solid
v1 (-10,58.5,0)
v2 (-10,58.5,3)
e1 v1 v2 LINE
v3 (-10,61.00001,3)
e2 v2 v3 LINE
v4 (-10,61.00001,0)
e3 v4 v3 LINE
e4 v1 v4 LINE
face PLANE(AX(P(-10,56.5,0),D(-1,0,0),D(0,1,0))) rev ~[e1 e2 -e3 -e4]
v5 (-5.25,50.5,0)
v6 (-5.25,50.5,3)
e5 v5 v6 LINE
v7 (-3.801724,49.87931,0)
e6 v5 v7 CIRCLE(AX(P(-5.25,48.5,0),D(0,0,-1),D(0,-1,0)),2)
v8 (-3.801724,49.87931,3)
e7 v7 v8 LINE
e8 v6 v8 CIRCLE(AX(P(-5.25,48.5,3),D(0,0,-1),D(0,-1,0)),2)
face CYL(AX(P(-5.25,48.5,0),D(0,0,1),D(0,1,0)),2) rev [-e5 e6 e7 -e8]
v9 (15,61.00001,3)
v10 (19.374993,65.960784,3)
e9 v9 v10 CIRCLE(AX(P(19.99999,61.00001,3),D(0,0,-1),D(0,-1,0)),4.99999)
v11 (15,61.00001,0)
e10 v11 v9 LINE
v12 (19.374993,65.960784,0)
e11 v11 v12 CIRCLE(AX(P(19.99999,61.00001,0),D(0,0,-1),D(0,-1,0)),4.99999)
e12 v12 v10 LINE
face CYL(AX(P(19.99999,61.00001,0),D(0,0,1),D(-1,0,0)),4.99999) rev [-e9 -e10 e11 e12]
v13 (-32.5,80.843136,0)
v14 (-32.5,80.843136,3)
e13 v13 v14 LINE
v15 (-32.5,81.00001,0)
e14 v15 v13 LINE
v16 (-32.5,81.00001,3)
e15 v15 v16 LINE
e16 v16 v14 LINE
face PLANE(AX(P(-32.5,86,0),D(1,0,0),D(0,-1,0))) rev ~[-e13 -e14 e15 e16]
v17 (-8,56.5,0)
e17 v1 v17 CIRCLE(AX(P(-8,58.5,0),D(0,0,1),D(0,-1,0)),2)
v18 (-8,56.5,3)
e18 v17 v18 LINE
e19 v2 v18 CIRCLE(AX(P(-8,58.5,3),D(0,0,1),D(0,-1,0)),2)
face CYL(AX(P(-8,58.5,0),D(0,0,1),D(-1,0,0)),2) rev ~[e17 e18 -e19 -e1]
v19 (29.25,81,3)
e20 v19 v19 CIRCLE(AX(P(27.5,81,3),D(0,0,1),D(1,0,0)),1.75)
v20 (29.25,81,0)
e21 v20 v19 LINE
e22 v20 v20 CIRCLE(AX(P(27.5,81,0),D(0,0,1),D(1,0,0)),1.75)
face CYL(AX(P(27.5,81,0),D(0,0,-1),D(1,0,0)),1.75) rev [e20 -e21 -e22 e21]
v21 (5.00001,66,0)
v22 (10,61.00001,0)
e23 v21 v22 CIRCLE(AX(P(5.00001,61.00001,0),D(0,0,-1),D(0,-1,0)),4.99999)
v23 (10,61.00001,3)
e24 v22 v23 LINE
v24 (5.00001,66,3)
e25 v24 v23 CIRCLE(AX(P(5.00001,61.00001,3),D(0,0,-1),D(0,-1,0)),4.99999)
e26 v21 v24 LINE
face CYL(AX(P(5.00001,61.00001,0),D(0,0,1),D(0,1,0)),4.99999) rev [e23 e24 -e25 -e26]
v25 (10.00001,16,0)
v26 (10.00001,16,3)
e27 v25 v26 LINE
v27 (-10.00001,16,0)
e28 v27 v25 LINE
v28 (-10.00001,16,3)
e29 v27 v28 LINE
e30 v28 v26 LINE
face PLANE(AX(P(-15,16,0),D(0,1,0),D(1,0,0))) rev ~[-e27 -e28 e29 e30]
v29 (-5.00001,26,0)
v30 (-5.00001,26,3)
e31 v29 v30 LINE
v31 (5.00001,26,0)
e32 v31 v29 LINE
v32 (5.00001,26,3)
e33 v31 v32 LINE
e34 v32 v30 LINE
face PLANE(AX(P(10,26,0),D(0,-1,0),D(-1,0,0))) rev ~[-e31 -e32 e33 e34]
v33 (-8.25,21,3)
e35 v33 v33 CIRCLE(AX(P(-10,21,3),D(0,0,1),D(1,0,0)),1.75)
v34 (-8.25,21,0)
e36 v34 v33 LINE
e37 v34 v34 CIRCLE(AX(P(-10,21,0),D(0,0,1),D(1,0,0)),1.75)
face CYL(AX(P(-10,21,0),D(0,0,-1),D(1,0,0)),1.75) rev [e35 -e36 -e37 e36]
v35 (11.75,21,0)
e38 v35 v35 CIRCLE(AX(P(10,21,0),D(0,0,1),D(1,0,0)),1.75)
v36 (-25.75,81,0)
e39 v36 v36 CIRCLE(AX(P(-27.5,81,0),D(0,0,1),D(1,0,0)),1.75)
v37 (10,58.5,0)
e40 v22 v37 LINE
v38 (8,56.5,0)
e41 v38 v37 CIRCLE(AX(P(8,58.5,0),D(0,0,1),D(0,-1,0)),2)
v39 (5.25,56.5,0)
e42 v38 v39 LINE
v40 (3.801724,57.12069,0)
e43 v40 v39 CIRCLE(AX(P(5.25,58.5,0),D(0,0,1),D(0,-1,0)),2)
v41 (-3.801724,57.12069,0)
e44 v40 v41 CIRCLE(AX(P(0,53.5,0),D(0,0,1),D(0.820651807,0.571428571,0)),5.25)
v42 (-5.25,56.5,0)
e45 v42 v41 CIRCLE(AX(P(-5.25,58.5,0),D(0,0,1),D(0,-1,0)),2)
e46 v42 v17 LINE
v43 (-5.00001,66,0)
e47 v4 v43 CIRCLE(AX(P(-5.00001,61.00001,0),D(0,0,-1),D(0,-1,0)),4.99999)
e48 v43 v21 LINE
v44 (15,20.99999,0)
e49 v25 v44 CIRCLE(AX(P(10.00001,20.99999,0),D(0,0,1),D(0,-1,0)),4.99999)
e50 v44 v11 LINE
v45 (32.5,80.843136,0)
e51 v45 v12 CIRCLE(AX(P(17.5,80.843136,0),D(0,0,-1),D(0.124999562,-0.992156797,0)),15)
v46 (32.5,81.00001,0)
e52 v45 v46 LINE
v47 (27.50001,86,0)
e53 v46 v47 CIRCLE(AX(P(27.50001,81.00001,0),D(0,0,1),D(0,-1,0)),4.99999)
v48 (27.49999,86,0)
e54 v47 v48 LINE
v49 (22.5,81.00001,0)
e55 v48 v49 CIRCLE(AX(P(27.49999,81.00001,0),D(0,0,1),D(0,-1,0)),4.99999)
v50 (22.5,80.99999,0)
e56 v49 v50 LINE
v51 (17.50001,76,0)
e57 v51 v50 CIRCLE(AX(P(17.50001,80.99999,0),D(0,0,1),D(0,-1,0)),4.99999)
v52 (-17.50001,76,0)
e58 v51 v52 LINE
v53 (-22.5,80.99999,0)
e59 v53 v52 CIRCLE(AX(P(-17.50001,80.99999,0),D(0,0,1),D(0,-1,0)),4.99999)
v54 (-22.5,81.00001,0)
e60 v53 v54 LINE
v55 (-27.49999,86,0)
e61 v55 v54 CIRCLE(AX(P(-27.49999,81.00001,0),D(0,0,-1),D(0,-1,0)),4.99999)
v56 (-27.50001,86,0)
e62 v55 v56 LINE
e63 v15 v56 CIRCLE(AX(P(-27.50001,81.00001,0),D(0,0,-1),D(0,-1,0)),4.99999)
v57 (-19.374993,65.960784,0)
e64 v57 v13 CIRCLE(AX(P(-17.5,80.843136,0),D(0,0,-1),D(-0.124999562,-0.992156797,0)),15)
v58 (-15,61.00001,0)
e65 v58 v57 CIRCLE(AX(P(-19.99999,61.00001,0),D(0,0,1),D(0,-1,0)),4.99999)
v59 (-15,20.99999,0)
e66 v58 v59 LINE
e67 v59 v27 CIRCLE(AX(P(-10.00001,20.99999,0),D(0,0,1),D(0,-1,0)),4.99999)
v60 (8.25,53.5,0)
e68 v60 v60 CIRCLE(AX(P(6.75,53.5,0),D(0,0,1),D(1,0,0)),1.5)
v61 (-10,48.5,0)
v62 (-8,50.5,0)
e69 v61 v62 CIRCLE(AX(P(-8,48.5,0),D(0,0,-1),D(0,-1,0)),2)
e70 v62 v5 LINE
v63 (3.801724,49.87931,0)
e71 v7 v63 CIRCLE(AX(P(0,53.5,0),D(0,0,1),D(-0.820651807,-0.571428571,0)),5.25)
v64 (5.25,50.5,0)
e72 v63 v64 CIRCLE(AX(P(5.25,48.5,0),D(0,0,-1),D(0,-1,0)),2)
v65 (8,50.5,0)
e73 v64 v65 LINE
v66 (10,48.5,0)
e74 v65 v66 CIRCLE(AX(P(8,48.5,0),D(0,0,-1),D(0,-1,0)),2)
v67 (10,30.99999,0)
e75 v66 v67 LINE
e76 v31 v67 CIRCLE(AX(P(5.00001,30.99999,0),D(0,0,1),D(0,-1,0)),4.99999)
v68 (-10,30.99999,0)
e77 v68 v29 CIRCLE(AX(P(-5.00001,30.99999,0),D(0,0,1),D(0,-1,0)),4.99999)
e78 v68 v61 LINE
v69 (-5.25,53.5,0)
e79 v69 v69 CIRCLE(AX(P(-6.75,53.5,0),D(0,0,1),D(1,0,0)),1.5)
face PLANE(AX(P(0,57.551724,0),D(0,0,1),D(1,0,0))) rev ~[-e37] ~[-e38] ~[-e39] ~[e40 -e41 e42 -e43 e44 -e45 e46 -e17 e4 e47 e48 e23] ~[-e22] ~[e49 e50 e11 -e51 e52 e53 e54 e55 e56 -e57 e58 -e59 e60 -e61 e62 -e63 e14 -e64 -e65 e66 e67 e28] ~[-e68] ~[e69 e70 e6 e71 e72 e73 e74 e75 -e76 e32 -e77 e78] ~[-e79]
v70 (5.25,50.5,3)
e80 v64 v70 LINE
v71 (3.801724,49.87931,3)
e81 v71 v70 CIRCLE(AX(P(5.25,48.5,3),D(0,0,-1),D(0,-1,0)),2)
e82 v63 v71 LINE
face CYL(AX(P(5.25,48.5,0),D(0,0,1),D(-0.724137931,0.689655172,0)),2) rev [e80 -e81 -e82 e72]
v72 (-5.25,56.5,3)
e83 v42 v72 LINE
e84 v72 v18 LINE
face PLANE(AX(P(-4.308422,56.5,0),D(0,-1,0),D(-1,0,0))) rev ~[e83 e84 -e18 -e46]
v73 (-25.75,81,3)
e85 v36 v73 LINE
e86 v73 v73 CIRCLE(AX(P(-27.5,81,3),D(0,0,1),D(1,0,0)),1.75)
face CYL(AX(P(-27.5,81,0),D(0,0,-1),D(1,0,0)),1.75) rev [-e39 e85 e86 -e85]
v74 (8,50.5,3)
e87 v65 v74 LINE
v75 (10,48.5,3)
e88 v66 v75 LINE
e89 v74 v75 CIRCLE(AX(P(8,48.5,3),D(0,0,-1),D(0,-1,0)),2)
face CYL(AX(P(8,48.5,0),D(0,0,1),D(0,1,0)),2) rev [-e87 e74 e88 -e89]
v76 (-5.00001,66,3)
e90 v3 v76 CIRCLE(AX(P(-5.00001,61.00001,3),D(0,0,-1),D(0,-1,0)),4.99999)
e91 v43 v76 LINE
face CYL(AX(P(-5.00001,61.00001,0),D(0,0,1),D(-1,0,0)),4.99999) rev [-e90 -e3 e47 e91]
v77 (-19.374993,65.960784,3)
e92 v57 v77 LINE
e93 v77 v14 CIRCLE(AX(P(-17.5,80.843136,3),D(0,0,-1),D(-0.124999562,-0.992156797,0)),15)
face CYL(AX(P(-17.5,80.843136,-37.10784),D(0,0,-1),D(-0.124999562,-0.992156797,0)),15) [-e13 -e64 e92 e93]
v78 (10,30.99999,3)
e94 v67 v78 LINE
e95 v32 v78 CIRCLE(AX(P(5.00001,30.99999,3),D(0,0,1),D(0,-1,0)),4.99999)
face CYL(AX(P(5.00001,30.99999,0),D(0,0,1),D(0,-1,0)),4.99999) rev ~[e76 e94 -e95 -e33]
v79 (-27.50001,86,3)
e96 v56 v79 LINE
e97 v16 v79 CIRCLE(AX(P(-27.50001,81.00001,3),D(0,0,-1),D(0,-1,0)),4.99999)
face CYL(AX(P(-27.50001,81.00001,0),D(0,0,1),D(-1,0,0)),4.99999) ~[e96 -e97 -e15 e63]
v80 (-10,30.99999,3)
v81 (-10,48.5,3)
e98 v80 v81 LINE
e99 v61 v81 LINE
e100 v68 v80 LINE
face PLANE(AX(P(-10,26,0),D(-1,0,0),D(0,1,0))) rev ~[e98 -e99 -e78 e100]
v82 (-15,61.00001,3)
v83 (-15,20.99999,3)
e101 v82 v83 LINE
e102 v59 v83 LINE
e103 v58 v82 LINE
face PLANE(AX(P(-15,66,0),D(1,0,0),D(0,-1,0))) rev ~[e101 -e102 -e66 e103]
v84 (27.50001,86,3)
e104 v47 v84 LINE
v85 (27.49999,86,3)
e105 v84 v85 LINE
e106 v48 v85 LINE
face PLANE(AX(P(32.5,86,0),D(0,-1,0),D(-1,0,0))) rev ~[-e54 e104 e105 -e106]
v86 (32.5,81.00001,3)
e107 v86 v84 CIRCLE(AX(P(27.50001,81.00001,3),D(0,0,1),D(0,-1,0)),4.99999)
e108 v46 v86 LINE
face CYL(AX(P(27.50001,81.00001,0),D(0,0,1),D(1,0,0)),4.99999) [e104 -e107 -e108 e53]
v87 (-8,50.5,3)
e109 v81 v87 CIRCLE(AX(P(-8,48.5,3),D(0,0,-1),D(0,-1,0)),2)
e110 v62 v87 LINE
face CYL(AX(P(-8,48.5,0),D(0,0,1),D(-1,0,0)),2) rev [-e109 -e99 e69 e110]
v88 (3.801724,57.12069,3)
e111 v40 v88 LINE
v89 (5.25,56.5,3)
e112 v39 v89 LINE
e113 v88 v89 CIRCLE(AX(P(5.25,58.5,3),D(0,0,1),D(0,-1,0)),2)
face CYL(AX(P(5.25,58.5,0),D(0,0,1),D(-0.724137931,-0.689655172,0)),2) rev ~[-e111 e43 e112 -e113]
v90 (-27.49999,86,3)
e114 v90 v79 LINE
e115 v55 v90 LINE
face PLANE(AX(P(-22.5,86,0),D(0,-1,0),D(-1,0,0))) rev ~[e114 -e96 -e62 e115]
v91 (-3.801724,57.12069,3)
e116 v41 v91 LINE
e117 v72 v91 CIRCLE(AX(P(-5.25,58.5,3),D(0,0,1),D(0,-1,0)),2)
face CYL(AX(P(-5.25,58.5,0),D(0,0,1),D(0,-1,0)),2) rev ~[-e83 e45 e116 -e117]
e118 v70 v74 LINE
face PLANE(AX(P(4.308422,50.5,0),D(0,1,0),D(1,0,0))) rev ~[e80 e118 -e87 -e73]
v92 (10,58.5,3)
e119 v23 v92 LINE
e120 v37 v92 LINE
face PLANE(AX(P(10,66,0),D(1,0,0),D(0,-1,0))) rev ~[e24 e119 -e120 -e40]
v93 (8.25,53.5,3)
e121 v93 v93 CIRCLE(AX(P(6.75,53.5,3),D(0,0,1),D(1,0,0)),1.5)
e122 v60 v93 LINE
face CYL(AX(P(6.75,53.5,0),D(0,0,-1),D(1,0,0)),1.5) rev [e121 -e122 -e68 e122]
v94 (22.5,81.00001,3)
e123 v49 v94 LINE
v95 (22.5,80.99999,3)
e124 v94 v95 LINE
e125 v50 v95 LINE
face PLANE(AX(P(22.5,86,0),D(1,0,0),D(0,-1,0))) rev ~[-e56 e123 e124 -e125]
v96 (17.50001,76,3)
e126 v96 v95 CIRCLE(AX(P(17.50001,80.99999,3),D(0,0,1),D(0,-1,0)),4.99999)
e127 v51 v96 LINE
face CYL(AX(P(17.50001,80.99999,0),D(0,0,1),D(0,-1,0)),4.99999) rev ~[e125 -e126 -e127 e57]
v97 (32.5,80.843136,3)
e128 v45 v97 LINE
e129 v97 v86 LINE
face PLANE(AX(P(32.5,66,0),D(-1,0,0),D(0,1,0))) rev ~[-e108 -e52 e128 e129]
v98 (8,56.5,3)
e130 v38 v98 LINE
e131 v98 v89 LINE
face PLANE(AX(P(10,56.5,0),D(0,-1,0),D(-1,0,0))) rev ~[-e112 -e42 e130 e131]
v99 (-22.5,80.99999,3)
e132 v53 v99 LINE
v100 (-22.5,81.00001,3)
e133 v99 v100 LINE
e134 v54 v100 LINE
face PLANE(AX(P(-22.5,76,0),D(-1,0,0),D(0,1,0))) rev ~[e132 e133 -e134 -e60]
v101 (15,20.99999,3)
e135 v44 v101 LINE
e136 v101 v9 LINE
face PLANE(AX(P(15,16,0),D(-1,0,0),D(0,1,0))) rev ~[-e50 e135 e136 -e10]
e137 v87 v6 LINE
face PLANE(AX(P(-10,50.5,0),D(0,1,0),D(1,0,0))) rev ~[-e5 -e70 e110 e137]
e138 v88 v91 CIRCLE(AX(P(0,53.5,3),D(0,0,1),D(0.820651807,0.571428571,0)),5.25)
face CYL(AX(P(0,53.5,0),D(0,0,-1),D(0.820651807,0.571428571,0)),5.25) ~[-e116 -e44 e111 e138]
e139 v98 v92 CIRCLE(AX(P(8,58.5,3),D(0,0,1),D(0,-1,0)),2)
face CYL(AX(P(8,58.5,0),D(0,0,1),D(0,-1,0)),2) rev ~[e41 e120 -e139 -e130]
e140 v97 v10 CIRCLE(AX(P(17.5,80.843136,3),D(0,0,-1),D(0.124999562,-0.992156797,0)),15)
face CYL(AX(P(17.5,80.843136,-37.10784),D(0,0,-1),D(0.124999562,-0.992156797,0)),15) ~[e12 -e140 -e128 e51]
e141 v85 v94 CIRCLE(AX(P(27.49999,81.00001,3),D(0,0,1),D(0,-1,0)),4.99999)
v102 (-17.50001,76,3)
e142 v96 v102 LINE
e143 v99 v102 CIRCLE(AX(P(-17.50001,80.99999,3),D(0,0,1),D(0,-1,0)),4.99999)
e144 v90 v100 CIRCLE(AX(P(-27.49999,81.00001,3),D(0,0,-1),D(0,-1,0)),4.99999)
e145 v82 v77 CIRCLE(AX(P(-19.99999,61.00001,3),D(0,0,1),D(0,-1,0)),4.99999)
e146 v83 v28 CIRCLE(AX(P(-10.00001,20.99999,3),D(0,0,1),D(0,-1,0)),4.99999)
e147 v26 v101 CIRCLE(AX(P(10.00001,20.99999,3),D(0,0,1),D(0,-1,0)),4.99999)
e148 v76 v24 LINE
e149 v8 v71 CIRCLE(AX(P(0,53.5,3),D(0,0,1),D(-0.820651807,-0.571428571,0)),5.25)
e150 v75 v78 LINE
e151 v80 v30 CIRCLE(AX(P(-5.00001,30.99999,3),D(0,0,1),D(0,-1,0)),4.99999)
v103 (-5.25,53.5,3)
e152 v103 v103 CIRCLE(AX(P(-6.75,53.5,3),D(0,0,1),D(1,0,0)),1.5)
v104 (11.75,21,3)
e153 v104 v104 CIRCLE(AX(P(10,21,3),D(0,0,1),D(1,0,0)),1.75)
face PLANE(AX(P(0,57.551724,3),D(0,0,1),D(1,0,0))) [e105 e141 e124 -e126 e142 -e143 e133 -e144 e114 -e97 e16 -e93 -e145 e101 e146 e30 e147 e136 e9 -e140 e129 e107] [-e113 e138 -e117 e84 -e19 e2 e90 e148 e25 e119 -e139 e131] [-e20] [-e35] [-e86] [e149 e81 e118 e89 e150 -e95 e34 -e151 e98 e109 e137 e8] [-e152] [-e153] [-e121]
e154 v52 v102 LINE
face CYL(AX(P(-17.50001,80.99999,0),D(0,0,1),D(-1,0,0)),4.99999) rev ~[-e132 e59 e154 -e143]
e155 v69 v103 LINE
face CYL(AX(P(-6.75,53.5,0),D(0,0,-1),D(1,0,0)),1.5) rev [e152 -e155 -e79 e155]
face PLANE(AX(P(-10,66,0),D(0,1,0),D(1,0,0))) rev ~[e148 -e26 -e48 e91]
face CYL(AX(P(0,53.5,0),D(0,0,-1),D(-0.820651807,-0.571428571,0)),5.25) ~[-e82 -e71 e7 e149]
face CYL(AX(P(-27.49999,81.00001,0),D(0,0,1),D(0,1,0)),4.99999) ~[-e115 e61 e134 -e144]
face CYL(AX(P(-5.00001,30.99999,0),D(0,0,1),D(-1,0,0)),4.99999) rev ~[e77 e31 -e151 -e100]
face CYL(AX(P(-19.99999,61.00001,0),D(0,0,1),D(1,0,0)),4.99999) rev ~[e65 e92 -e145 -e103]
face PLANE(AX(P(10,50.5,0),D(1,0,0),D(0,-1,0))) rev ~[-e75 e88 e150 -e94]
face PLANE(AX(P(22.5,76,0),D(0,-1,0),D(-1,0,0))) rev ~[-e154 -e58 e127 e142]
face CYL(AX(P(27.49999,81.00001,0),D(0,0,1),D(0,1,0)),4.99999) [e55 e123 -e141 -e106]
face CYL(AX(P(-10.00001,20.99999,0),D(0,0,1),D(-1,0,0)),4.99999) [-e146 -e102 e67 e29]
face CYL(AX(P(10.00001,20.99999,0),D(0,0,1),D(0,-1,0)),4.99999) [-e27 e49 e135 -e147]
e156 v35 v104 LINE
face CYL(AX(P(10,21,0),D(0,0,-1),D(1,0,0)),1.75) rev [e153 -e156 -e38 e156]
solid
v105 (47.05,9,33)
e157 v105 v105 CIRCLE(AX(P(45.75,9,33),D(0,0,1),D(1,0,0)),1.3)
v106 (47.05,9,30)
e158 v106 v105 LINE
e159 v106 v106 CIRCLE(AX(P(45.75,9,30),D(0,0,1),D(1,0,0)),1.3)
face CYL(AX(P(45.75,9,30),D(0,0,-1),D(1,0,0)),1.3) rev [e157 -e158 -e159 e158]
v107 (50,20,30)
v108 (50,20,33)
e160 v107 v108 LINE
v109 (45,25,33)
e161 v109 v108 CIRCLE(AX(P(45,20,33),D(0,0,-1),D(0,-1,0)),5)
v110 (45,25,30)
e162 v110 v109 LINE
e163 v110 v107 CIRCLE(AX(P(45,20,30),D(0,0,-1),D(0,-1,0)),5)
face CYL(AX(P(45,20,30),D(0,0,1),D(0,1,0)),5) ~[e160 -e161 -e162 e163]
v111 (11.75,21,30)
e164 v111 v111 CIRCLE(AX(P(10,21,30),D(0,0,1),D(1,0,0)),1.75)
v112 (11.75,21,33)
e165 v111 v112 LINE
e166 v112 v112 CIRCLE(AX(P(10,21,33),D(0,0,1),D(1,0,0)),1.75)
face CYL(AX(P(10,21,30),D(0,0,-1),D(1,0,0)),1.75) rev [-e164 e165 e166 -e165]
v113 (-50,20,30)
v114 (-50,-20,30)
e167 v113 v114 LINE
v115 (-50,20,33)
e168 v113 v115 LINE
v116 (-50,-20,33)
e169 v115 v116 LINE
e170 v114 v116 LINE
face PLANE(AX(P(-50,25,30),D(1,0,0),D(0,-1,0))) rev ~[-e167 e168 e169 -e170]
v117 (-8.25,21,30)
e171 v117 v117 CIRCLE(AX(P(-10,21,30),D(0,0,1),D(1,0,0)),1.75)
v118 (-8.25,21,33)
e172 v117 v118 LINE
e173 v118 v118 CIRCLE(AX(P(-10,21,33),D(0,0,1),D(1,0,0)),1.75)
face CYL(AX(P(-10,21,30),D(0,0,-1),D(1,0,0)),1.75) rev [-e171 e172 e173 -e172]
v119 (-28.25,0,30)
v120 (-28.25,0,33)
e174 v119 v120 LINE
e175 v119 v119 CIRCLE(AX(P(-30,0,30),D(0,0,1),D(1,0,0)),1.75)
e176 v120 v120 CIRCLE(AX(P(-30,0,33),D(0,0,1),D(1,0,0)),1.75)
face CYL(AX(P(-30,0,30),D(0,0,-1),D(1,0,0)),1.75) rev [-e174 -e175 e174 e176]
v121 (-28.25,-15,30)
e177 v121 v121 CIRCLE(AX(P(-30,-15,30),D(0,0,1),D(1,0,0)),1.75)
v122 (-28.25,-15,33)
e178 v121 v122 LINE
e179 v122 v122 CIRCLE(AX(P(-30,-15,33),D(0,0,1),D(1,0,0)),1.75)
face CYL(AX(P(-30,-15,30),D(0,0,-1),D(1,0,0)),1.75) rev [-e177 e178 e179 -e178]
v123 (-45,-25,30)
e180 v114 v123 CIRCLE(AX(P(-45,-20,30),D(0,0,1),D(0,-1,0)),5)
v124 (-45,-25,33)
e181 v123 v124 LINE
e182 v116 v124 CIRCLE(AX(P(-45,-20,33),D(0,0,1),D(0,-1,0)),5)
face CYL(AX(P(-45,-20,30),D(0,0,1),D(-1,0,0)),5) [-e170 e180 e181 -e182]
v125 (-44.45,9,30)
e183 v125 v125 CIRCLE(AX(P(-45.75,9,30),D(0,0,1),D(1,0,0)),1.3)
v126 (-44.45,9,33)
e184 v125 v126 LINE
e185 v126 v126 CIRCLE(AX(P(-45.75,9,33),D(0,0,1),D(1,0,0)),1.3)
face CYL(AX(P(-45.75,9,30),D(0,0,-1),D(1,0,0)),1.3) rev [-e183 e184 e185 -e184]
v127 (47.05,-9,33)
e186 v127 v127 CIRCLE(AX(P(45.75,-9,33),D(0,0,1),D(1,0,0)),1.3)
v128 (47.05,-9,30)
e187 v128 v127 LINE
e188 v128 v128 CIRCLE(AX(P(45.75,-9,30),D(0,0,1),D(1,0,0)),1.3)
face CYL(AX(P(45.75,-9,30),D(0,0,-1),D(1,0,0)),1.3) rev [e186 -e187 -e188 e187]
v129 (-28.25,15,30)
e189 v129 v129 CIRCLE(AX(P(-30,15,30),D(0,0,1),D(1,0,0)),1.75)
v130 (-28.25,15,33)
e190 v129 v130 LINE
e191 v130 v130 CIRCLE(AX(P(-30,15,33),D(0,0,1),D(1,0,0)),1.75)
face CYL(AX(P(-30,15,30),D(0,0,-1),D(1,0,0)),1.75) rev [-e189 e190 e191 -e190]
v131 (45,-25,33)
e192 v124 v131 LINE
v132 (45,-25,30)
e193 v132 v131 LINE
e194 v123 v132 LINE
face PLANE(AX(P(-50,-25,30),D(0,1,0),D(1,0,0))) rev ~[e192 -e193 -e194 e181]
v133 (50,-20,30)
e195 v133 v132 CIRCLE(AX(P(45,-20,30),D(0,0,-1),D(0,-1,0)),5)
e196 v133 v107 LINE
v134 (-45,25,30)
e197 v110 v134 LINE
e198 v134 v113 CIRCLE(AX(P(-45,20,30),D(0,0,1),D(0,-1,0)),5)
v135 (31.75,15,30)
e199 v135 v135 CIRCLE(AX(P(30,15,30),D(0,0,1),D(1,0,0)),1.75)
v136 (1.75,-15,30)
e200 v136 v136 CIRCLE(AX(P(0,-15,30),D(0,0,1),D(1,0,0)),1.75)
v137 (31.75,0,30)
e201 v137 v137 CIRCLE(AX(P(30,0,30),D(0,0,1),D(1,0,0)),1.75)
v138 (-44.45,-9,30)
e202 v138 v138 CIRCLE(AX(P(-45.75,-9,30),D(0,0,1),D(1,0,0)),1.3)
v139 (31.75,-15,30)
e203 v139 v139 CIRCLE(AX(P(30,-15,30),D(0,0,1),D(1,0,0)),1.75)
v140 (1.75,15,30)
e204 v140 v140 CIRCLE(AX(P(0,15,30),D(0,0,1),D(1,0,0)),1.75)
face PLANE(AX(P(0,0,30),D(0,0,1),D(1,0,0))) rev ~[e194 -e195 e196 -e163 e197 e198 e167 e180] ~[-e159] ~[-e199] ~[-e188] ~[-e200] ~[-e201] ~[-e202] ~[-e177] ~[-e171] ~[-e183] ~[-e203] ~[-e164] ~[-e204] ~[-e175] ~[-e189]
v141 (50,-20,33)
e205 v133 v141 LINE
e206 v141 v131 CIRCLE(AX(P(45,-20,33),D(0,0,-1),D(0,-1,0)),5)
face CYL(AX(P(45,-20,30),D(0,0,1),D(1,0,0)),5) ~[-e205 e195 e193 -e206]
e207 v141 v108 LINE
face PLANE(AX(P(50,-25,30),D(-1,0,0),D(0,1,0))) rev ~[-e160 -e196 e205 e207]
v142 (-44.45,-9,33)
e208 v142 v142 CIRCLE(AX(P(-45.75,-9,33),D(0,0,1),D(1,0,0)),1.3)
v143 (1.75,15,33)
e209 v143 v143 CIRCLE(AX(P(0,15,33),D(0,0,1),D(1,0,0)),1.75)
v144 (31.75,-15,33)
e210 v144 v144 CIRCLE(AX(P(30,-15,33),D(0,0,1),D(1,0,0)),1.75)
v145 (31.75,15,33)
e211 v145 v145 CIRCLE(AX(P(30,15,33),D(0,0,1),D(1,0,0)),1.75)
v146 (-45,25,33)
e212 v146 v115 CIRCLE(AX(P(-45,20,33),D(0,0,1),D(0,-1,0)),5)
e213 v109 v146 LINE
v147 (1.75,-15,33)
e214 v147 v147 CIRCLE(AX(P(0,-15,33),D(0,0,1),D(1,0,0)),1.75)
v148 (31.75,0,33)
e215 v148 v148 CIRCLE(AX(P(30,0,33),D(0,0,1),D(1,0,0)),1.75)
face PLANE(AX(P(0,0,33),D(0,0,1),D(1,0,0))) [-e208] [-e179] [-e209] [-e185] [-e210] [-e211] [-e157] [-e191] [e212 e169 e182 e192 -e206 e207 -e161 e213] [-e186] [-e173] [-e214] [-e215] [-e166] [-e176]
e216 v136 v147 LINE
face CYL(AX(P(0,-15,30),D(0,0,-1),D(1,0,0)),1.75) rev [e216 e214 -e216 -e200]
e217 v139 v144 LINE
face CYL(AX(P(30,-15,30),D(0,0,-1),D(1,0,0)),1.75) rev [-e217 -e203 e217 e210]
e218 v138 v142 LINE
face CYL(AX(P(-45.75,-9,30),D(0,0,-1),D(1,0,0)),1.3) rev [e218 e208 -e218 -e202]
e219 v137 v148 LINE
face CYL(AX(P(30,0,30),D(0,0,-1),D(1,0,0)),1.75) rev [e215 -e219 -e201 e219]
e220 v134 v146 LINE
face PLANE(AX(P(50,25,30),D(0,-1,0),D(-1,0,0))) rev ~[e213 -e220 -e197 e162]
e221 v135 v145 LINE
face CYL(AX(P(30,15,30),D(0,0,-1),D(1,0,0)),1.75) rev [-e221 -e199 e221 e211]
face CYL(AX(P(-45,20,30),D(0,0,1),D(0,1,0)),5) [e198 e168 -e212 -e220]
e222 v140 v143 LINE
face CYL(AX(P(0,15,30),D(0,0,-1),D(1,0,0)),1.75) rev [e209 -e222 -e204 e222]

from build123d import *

# Parameters (mm, degrees)
F1_R        = 1.75
F1_R_2      = 1.3
F2_DEPTH    = 3
F3_R        = 1.75
F3_R_2      = 1.5
F4_DEPTH    = 3
F5_R        = 4.99999
F6_T1_DEPTH = 77.2156800691
F7_R        = 5
F8_R        = 2


# Not quite as in the source:
# - a fillet or chamfer that OpenCascade refuses, or shapes differently, is made with other operations: its cross-section is extruded or revolved along the edge and cut away or added
# - a fillet or chamfer is up to 0.001 mm smaller than in the source, because OpenCascade refuses the exact size
# - a feature names something its author has since deleted; it is built from what else it names


with BuildPart() as f2:
    # F1 (on offset) → F2 (new body)
    with BuildSketch(Plane.XY.offset(30)):
        Polygon((50, 25), (-50, 25), (-50, 0), (-50, -25), (50, -25), (50, 0), align=None)
        with Locations((-30, -15)):
            Circle(F1_R, mode=Mode.SUBTRACT)
        with Locations((-45.75, -9)):
            Circle(F1_R_2, mode=Mode.SUBTRACT)
        with Locations((0, -15)):
            Circle(F1_R, mode=Mode.SUBTRACT)
        with Locations((30, -15)):
            Circle(F1_R, mode=Mode.SUBTRACT)
        with Locations((45.75, -9)):
            Circle(F1_R_2, mode=Mode.SUBTRACT)
        with Locations((-30, 0)):
            Circle(F1_R, mode=Mode.SUBTRACT)
        with Locations((-45.75, 9)):
            Circle(F1_R_2, mode=Mode.SUBTRACT)
        with Locations((-30, 15)):
            Circle(F1_R, mode=Mode.SUBTRACT)
        with Locations((-10, 21)):
            Circle(F1_R, mode=Mode.SUBTRACT)
        with Locations((30, 0)):
            Circle(F1_R, mode=Mode.SUBTRACT)
        with Locations((45.75, 9)):
            Circle(F1_R_2, mode=Mode.SUBTRACT)
        with Locations((0, 15)):
            Circle(F1_R, mode=Mode.SUBTRACT)
        with Locations((10, 21)):
            Circle(F1_R, mode=Mode.SUBTRACT)
        with Locations((30, 15)):
            Circle(F1_R, mode=Mode.SUBTRACT)
    extrude(amount=F2_DEPTH)

    # F7
    f7_edges = [f2.edges().sort_by_distance(p)[0] for p in [
        (-50, 25, 31.5),
        (-50, -25, 31.5),
        (50, -25, 31.5),
        (50, 25, 31.5),
    ]]
    fillet(f7_edges, radius=F7_R)


with BuildPart() as f4:
    # F3 (on Top) → F4 (new body)
    with BuildSketch(Plane.XY):
        Polygon((-15, 66), (-15, 16), (15, 16), (15, 66), (32.5, 66), (32.5, 86), (22.5, 86), (22.5, 76), (-22.5, 76), (-22.5, 86), (-32.5, 86), (-32.5, 66), align=None)
        with Locations((-10, 21)):
            Circle(F3_R, mode=Mode.SUBTRACT)
        with Locations((10, 21)):
            Circle(F3_R, mode=Mode.SUBTRACT)
        Polygon((-10, 56.5), (-10, 66), (10, 66), (10, 56.5), (10, 50.5), (10, 26), (-10, 26), (-10, 50.5), align=None, mode=Mode.SUBTRACT)
        with Locations((-27.5, 81)):
            Circle(F3_R, mode=Mode.SUBTRACT)
        with Locations((27.5, 81)):
            Circle(F3_R, mode=Mode.SUBTRACT)
        with BuildLine():
            Line((-4.3084219849, 56.5), (-10, 56.5))
            Line((-10, 56.5), (-10, 50.5))
            Line((-10, 50.5), (-4.3084219849, 50.5))
            ThreePointArc((-4.3084219849, 50.5), (0, 48.25), (4.3084219849, 50.5))
            Line((4.3084219849, 50.5), (10, 50.5))
            Line((10, 50.5), (10, 56.5))
            Line((10, 56.5), (4.3084219849, 56.5))
            ThreePointArc((4.3084219849, 56.5), (0, 58.75), (-4.3084219849, 56.5))
        make_face()
        with Locations((-6.75, 53.5)):
            Circle(F3_R_2, mode=Mode.SUBTRACT)
        with Locations((6.75, 53.5)):
            Circle(F3_R_2, mode=Mode.SUBTRACT)
    extrude(amount=F4_DEPTH)

    # F5 (radius 5 in the source; OpenCascade refuses exactly that, so slightly less here)
    f5_edges = [f4.edges().sort_by_distance(p)[0] for p in [
        (-15, 66, 1.5),
        (-22.5, 76, 1.5),
        (-22.5, 86, 1.5),
        (-32.5, 86, 1.5),
        (22.5, 76, 1.5),
        (22.5, 86, 1.5),
        (32.5, 86, 1.5),
        (15, 66, 1.5),
        (15, 16, 1.5),
        (-15, 16, 1.5),
        (-10, 66, 1.5),
        (10, 66, 1.5),
        (10, 26, 1.5),
        (-10, 26, 1.5),
    ]]
    fillet(f5_edges, radius=F5_R)

    # F6: fillet of radius 15 on 2 edges, made by hand

    # F6_s2 → F6_t1 (cut)
    with BuildSketch(Plane.XY.offset(-37.1078400345)):
        with BuildLine():
            ThreePointArc((19.3749934375, 65.9607840623), (28.7499978125, 70.9215661169), (32.5, 80.8431360138))
            Line((32.5, 80.8431360138), (34, 80.8431360138))
            Line((34, 80.8431360138), (34, 66))
            Line((34, 66), (32.5, 64.5))
            ThreePointArc((32.5, 64.5), (19.99999, 64.5), (19.5624927812, 64.4725488671))
            Line((19.5624927812, 64.4725488671), (19.3749934375, 65.9607840623))
        make_face()
        with BuildLine():
            ThreePointArc((-19.3749934375, 65.9607840623), (-28.7499978125, 70.9215661169), (-32.5, 80.8431360138))
            Line((-32.5, 80.8431360138), (-34, 80.8431360138))
            Line((-34, 80.8431360138), (-34, 66))
            Line((-34, 66), (-32.5, 64.5))
            ThreePointArc((-32.5, 64.5), (-19.99999, 64.5), (-19.5624927812, 64.4725488671))
            Line((-19.5624927812, 64.4725488671), (-19.3749934375, 65.9607840623))
        make_face()
    extrude(amount=F6_T1_DEPTH, mode=Mode.SUBTRACT)

    # F8
    f8_edges = [f4.edges().sort_by_distance(p)[0] for p in [
        (-10, 56.5, 1.5),
        (-10, 50.5, 1.5),
        (10, 50.5, 1.5),
        (10, 56.5, 1.5),
        (4.308422, 56.5, 1.5),
        (-4.308422, 56.5, 1.5),
        (-4.308422, 50.5, 1.5),
        (4.308422, 50.5, 1.5),
    ]]
    fillet(f8_edges, radius=F8_R)


solid = Compound([f2.part, f4.part])
